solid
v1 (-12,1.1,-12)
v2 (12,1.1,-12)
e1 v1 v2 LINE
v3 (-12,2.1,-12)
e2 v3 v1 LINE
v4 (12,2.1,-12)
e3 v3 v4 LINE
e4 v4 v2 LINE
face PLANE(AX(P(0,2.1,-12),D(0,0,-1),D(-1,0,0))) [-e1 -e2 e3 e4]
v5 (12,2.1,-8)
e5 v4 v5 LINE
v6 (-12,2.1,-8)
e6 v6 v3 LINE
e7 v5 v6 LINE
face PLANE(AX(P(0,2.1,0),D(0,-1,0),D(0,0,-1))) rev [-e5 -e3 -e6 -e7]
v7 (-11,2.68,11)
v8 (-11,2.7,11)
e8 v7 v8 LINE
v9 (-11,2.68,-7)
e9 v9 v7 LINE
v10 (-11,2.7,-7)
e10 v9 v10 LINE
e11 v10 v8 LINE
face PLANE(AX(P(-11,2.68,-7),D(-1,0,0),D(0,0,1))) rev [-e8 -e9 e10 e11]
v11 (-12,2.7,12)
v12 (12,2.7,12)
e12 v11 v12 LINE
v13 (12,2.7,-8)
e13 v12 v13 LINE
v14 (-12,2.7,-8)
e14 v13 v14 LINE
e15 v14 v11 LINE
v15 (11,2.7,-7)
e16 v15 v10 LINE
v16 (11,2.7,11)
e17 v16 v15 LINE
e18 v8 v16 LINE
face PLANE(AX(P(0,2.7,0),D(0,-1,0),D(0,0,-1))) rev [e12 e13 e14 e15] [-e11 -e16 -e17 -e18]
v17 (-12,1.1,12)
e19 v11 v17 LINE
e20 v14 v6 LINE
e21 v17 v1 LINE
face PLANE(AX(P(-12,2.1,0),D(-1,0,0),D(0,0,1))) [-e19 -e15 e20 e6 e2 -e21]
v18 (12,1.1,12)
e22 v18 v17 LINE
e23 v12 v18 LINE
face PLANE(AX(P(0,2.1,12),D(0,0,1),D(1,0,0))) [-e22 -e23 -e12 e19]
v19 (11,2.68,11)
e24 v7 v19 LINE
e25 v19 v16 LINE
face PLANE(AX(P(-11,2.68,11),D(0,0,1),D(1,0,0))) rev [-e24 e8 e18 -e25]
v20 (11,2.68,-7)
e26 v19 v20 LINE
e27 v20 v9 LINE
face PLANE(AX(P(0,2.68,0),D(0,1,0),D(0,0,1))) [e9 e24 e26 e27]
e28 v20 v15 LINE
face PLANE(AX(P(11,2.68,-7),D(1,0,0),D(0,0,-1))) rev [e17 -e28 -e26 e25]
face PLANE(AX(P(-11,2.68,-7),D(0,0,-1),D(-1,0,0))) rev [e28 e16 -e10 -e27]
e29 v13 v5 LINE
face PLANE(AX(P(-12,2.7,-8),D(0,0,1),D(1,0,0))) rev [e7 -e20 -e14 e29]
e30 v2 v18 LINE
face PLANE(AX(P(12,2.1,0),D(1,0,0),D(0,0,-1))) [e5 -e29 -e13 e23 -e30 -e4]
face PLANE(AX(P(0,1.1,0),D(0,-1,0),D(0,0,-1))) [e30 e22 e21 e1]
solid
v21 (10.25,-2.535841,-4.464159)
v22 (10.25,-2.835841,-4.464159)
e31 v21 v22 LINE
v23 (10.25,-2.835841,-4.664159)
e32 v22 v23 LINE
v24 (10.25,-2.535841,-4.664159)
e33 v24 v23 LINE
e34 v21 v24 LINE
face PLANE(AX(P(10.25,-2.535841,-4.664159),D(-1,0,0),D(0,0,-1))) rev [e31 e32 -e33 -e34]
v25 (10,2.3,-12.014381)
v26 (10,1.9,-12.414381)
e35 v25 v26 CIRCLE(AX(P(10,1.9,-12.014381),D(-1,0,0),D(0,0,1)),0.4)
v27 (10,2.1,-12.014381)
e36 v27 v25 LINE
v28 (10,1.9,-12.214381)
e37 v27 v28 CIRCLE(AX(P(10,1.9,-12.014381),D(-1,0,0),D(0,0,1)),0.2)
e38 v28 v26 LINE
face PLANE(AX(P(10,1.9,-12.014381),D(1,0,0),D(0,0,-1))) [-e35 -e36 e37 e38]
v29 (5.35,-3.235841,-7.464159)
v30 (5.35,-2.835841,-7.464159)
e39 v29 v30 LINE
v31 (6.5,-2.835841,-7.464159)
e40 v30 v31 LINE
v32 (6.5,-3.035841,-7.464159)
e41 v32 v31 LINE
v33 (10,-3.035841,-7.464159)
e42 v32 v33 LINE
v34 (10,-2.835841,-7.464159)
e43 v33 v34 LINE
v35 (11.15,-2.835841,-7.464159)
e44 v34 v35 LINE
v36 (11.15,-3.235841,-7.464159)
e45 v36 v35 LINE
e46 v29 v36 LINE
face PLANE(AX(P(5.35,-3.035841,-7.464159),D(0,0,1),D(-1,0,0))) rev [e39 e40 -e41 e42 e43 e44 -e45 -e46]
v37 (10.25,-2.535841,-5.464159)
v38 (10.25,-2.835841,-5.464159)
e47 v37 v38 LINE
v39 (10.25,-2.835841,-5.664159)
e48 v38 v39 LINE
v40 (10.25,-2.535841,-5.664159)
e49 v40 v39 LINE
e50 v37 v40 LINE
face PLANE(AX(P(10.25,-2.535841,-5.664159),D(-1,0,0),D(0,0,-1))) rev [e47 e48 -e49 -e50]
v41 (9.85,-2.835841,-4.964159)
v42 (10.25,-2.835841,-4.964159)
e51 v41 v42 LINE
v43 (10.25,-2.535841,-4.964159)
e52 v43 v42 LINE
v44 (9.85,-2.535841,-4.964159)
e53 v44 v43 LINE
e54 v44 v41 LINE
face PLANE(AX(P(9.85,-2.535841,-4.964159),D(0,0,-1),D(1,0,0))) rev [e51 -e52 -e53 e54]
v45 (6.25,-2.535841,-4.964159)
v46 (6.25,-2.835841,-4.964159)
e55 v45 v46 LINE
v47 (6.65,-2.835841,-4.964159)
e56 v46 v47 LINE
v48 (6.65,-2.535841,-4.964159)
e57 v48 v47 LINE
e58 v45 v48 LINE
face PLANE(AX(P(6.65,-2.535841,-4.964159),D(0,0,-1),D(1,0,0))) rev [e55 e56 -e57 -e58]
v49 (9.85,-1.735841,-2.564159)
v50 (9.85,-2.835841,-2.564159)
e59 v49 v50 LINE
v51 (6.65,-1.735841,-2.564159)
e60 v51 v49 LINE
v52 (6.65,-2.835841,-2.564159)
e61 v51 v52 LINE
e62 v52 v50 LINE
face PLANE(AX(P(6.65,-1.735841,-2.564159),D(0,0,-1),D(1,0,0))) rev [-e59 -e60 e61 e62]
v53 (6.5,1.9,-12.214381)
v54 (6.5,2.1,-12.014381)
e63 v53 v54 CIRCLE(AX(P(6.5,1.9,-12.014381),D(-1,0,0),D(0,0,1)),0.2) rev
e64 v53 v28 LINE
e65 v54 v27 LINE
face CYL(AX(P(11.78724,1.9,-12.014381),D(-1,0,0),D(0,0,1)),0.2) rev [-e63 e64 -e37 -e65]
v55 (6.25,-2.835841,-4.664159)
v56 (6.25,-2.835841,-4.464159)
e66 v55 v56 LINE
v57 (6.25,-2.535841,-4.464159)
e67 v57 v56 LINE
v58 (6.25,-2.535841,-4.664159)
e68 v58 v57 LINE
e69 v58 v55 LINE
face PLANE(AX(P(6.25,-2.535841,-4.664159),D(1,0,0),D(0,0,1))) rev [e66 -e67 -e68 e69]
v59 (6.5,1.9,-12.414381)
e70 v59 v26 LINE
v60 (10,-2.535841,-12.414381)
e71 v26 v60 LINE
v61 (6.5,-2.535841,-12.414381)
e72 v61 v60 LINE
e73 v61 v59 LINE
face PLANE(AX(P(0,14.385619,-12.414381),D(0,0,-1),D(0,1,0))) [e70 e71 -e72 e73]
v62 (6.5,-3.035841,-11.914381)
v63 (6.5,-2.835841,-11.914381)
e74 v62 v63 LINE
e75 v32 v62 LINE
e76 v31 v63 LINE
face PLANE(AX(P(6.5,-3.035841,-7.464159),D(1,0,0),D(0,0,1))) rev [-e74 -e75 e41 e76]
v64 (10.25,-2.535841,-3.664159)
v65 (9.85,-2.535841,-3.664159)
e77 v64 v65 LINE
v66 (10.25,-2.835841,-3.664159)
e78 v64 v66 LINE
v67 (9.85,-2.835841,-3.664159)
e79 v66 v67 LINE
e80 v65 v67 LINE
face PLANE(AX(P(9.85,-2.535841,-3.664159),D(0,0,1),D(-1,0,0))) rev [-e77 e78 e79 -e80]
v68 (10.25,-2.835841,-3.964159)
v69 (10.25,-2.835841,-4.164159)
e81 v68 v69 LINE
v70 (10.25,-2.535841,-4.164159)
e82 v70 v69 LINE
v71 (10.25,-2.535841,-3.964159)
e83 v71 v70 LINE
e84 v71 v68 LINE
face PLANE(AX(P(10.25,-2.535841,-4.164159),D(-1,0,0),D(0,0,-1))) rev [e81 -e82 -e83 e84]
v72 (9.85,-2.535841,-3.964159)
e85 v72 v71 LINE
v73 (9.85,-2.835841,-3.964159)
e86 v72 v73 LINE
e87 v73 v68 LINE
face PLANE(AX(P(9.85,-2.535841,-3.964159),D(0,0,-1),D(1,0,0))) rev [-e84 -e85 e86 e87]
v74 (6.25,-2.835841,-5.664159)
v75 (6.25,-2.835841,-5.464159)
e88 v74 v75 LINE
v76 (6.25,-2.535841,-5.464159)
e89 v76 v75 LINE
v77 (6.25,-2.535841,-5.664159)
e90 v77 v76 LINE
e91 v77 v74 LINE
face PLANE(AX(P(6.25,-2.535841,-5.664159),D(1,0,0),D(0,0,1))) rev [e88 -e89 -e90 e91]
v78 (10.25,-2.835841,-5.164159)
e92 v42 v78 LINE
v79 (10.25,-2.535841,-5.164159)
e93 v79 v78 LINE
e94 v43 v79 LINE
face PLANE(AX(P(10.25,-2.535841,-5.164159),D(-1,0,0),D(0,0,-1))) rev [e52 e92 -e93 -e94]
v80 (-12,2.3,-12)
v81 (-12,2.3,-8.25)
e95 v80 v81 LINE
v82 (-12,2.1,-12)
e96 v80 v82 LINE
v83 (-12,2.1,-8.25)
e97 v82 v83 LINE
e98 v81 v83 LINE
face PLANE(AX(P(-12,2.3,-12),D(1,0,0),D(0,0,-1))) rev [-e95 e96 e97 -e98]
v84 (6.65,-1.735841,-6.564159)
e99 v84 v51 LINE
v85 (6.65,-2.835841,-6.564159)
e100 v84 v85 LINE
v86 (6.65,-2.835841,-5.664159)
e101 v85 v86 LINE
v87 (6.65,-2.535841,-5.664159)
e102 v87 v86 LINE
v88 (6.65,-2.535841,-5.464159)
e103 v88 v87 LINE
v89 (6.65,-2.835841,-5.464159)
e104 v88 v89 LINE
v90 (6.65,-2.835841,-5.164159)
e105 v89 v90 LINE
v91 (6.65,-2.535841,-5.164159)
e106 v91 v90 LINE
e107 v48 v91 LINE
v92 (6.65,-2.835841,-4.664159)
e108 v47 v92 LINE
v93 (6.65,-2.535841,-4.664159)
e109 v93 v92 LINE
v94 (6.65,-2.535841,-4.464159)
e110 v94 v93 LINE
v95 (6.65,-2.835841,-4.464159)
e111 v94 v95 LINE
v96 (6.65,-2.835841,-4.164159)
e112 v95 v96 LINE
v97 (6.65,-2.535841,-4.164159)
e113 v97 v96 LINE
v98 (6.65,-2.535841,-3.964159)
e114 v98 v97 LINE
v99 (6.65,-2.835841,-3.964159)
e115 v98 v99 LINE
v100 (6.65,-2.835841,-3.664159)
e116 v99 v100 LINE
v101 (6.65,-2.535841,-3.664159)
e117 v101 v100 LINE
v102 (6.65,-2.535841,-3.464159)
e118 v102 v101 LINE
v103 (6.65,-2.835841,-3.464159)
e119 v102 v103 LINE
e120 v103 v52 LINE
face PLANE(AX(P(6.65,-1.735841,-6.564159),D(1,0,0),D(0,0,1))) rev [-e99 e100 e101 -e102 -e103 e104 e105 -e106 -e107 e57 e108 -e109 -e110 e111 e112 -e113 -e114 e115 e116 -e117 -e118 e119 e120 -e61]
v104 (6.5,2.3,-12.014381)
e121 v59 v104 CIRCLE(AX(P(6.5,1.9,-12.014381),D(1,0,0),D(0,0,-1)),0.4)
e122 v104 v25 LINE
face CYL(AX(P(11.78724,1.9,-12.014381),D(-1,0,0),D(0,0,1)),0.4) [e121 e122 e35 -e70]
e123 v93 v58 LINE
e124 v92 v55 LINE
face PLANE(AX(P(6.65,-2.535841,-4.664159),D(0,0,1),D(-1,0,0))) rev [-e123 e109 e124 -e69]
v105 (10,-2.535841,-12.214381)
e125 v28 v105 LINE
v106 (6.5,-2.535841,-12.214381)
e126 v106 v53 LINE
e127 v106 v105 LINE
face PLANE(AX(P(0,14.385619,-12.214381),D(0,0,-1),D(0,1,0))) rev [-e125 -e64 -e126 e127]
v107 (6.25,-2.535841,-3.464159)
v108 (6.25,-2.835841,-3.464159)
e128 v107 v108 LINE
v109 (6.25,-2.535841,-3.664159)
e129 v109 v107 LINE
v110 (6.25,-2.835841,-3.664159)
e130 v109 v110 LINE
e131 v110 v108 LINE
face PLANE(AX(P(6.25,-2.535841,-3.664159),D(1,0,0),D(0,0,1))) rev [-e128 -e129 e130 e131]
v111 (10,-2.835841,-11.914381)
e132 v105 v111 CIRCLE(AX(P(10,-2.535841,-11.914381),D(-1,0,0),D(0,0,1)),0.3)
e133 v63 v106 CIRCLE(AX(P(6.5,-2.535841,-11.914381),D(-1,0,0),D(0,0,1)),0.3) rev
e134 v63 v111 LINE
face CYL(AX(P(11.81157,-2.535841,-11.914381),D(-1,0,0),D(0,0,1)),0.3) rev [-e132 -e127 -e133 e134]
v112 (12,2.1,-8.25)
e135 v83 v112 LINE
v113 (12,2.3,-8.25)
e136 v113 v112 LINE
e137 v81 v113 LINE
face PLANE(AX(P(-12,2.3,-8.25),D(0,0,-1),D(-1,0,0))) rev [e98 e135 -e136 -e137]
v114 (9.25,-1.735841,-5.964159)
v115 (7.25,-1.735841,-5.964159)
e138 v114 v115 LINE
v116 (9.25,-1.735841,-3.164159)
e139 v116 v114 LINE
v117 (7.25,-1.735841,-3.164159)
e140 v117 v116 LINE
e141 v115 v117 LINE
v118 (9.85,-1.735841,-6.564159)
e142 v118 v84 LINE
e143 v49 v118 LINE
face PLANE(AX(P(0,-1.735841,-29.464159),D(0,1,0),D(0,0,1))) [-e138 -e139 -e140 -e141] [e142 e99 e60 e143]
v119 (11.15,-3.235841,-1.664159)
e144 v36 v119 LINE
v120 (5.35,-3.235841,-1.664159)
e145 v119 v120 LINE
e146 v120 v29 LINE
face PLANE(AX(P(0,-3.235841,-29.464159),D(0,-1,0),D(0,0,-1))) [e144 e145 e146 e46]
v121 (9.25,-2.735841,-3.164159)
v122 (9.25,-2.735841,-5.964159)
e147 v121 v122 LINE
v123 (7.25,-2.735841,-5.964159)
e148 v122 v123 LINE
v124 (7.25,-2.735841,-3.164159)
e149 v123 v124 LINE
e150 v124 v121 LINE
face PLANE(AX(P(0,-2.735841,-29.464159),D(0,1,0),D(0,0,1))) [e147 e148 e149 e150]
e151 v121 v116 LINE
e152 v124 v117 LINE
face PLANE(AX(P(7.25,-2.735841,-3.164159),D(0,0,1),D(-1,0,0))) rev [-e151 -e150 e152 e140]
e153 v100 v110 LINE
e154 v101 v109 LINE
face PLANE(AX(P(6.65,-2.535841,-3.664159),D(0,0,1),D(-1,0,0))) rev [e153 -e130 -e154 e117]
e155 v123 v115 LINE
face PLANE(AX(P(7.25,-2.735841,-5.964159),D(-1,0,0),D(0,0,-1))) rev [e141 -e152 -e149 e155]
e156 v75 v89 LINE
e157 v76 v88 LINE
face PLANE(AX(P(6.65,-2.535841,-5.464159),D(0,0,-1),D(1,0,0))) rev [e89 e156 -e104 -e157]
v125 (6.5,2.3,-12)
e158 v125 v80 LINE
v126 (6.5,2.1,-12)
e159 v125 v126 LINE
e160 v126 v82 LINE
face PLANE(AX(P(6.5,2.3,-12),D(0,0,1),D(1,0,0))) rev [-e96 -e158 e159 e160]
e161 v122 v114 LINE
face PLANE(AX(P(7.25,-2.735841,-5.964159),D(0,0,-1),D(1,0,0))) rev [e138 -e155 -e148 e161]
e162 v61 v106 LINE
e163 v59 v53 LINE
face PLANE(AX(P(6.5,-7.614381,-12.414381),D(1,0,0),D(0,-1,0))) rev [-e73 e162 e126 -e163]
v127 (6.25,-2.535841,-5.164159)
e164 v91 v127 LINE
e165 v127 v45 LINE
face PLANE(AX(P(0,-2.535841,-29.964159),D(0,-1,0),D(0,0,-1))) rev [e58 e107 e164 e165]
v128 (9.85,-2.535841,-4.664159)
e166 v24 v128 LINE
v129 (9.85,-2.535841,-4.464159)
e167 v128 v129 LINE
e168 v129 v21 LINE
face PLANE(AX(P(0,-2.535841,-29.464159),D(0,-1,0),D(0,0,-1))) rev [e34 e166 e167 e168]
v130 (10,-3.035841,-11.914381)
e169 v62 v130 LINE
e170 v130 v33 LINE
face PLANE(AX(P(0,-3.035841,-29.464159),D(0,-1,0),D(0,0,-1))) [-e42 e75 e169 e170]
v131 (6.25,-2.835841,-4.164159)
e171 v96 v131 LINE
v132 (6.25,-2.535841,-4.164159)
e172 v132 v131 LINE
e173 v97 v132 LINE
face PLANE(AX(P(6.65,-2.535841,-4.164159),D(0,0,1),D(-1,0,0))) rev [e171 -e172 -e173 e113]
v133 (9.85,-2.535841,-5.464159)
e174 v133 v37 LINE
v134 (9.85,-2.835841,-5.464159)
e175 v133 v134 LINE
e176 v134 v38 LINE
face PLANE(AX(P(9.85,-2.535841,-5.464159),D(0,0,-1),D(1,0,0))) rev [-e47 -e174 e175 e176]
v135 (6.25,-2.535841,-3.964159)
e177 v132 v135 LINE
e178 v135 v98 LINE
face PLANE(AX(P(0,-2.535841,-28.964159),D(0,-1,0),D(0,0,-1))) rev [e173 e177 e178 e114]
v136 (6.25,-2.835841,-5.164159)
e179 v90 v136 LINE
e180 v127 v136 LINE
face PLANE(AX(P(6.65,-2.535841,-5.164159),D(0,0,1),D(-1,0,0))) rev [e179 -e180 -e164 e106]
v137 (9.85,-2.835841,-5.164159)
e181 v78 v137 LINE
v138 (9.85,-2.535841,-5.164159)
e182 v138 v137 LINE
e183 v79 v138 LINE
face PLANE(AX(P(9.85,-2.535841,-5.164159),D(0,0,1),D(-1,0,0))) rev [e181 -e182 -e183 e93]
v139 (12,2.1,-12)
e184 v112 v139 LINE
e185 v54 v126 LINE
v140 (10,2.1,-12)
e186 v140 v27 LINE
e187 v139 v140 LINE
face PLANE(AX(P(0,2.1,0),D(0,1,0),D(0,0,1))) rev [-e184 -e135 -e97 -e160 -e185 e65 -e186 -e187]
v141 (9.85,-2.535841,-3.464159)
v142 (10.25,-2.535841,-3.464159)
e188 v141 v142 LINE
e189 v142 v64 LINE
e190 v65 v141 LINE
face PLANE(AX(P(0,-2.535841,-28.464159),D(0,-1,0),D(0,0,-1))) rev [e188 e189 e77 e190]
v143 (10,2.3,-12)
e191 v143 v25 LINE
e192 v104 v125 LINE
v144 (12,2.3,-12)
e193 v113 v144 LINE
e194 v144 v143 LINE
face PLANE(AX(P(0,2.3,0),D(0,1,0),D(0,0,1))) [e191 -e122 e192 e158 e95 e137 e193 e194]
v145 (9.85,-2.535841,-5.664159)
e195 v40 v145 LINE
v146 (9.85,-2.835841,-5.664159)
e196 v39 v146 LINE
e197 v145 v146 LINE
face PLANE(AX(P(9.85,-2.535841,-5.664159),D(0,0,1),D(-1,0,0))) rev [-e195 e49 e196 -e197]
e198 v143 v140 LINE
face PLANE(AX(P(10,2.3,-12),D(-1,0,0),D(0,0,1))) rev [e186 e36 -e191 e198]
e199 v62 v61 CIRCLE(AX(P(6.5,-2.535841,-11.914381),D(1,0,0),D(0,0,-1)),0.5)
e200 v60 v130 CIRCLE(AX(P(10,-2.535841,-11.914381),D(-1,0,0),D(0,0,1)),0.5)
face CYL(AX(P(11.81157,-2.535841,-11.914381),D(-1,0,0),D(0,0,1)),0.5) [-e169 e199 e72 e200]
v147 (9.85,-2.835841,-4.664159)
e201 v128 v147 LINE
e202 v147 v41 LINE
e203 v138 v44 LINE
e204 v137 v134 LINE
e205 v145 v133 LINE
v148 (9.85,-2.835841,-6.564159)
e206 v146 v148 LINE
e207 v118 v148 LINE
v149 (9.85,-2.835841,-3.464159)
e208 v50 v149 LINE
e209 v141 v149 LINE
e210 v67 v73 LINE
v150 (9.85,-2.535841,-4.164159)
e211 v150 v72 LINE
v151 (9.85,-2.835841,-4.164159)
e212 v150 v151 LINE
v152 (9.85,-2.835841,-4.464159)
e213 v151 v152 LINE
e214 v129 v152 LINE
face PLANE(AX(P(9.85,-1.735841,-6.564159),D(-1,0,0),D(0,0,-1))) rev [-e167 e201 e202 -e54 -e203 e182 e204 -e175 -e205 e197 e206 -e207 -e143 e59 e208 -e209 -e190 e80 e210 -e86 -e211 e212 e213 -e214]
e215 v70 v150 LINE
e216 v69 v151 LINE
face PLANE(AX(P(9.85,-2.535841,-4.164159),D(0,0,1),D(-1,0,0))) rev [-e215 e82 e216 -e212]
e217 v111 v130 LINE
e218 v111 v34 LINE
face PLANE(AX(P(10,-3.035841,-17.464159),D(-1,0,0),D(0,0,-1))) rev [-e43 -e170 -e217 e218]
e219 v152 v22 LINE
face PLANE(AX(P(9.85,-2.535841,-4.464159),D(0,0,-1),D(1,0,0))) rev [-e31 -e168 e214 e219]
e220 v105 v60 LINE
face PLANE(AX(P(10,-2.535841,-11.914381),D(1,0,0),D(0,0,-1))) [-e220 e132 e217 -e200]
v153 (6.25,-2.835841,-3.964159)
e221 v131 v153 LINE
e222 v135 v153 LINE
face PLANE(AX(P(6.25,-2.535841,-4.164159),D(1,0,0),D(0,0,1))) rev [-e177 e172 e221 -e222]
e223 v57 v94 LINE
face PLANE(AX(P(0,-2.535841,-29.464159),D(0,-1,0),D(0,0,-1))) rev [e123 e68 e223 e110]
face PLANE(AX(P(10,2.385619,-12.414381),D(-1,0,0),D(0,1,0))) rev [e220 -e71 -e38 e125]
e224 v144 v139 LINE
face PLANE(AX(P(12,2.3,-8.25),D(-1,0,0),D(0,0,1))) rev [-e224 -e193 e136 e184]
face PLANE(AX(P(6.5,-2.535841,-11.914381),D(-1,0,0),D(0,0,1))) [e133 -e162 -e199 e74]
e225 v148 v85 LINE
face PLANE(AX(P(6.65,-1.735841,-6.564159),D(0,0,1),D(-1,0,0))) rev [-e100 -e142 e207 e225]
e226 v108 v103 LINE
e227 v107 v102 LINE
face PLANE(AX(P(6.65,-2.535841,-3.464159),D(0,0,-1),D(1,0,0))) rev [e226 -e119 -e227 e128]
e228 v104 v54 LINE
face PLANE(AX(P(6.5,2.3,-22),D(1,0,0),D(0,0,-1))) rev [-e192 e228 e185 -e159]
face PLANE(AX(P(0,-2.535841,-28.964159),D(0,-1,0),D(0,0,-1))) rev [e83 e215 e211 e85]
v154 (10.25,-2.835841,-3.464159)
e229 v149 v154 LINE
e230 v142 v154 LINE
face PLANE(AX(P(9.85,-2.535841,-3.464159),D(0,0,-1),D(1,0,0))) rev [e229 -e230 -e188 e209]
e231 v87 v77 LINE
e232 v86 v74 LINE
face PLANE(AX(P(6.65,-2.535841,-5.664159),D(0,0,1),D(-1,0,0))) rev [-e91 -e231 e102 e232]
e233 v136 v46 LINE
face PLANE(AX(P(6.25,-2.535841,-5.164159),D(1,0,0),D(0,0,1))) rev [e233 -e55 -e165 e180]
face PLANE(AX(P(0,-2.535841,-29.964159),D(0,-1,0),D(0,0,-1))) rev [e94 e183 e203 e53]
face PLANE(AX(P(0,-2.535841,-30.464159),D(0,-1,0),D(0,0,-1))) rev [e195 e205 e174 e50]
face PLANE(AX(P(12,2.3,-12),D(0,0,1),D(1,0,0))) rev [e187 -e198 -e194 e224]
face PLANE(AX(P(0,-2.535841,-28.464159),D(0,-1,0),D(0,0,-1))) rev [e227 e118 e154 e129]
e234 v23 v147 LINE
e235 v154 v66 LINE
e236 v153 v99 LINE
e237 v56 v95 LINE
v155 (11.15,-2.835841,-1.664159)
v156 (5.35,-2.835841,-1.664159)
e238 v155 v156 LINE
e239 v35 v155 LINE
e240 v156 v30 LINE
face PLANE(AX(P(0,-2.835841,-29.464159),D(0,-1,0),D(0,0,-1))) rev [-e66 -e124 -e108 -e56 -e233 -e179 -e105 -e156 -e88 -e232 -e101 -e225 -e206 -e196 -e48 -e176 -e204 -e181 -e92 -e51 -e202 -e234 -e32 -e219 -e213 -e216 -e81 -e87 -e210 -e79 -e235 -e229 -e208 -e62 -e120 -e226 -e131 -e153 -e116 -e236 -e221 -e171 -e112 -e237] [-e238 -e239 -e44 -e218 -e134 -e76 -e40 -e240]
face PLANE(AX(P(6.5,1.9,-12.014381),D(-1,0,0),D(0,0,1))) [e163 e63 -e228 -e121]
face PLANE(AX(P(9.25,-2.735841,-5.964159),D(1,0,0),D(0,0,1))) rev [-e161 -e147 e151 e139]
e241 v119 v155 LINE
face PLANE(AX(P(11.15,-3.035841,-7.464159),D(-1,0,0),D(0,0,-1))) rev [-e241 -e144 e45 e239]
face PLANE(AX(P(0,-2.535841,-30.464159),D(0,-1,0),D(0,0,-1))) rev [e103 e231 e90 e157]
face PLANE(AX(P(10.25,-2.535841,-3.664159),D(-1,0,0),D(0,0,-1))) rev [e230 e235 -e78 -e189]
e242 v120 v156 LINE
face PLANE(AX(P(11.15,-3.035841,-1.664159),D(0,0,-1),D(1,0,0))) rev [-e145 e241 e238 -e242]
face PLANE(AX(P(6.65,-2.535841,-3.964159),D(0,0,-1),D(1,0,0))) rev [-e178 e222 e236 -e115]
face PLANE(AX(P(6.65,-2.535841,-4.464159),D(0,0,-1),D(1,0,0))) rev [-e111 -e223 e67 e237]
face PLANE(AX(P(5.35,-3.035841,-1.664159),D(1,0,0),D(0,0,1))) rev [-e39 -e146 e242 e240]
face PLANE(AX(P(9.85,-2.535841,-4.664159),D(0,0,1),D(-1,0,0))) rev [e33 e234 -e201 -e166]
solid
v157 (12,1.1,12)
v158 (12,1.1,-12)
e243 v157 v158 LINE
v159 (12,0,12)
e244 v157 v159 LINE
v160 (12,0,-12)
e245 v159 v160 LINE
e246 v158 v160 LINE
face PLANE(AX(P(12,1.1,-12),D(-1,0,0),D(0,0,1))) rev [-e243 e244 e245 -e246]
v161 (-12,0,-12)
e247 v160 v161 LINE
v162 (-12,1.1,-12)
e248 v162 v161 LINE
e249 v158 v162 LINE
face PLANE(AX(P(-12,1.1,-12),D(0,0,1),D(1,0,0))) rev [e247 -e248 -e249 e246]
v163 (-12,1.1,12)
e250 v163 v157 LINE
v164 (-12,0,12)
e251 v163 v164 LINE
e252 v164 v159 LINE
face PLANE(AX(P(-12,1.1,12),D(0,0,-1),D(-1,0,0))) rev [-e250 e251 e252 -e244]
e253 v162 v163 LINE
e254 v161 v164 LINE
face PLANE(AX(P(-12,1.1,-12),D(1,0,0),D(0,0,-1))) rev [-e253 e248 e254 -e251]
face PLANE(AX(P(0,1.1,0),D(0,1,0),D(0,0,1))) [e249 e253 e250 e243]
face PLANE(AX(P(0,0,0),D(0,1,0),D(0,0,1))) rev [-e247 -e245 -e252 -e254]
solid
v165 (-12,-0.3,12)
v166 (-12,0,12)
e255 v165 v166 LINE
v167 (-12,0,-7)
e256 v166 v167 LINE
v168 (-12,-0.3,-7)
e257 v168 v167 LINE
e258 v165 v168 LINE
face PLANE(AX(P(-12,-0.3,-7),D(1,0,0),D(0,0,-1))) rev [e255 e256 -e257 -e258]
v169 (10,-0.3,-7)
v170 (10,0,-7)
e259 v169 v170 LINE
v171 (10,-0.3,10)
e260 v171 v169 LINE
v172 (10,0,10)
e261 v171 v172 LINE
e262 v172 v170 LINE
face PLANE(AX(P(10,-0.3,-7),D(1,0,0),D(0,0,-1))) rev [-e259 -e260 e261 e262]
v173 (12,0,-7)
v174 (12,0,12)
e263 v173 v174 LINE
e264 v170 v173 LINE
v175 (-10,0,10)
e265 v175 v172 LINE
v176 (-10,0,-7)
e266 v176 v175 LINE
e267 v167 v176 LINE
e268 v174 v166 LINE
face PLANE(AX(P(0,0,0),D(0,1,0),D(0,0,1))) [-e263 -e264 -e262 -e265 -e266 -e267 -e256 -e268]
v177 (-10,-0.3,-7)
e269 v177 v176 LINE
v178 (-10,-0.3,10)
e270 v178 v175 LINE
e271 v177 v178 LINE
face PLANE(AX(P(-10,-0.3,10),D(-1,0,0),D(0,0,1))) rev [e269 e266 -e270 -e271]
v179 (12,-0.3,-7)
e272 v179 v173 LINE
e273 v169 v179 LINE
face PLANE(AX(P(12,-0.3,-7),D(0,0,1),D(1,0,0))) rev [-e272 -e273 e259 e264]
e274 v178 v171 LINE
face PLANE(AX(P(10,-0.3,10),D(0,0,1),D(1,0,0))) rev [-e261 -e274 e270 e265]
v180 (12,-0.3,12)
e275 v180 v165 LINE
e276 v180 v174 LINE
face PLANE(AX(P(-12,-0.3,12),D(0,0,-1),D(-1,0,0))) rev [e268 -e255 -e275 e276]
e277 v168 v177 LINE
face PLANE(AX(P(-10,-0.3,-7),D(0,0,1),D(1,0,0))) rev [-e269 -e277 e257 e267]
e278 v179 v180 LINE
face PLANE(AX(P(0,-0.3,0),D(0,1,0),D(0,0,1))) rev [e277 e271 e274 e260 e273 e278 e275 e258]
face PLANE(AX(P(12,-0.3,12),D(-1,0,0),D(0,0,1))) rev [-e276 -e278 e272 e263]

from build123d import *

# Parameters (mm, degrees)
SKETCH_1_W                 = 24
SKETCH_1_H                 = 24
EXTRUDE_1_DEPTH            = 1.1
EXTRUDE_START              = 1.1
SKETCH_1_2_W               = 24
SKETCH_1_2_H               = 24
EXTRUDE_2_DEPTH            = 1
SKETCH_2_W                 = 24
SKETCH_2_H                 = 20
EXTRUDE_3_DEPTH            = 0.6
SM_BASE_FLANGE_1_DEPTH     = 0.2
SKETCH_8_W                 = 3.2
SKETCH_8_H                 = 4
EXTRUDE_4_DEPTH            = 1.1
SKETCH_9_W                 = 2
SKETCH_9_H                 = 2.8
CUT_EXTRUDE_1_DEPTH        = 1
SKETCH_18_W                = 5.8
SKETCH_18_H                = 5.8
EXTRUDE_6_DEPTH            = 0.2
SKETCH_19_W                = 0.4
SKETCH_19_H                = 0.2
EXTRUDE_7_DEPTH            = 0.3
SKETCH_17_W                = 22
SKETCH_17_H                = 18
CUT_EXTRUDE_2_DEPTH        = 0.02
EXTRUDE_5_DEPTH            = 0.3
PATTERN_LINEAR_1_COUNT     = 3
PATTERN_LINEAR_1_PITCH     = 0.5
PATTERN_LINEAR_1_COL_COUNT = 3
PATTERN_LINEAR_1_COL_PITCH = 0.5
OTHER_START                = 5.35
OTHER_11_DEPTH             = 5.8
OTHER_START_2              = 6.65
OTHER_11_2_DEPTH           = 3.2
OTHER_11_3_OUTLINE_W       = 5.8
OTHER_11_3_OUTLINE_H       = 0.4
OTHER_11_3_DEPTH           = 5.8
OTHER_11_4_OUTLINE_W       = 2.8
OTHER_11_4_OUTLINE_H       = 1
OTHER_11_4_DEPTH           = 0.6
OTHER_START_3              = 9.25
OTHER_11_5_OUTLINE_W       = 2.8
OTHER_11_5_OUTLINE_H       = 1
OTHER_11_5_DEPTH           = 0.6
OTHER_START_4              = 6.5
OTHER_11_6_OUTLINE_W       = 0.2
OTHER_11_6_OUTLINE_H       = 0.1
OTHER_11_6_DEPTH           = 3.5
OTHER_START_5              = 6.25
OTHER_11_7_OUTLINE_W       = 0.2
OTHER_11_7_OUTLINE_H       = 0.3
OTHER_11_7_DEPTH           = 0.4
OTHER_START_6              = 9.85
OTHER_11_8_OUTLINE_W       = 0.2
OTHER_11_8_OUTLINE_H       = 0.3
OTHER_11_8_DEPTH           = 0.4
OTHER_12_DEPTH             = 5.8
OTHER_12_2_DEPTH           = 3.2
OTHER_12_3_OUTLINE_W       = 0.4
OTHER_12_3_OUTLINE_H       = 5.8
OTHER_12_3_DEPTH           = 5.8
OTHER_12_4_OUTLINE_W       = 1
OTHER_12_4_OUTLINE_H       = 2.8
OTHER_12_4_DEPTH           = 0.6
OTHER_12_5_OUTLINE_W       = 1
OTHER_12_5_OUTLINE_H       = 2.8
OTHER_12_5_DEPTH           = 0.6
OTHER_12_6_OUTLINE_W       = 0.1
OTHER_12_6_OUTLINE_H       = 0.2
OTHER_12_6_DEPTH           = 3.5
OTHER_12_7_OUTLINE_W       = 0.3
OTHER_12_7_OUTLINE_H       = 0.2
OTHER_12_7_DEPTH           = 0.4
OTHER_12_8_OUTLINE_W       = 0.3
OTHER_12_8_OUTLINE_H       = 0.2
OTHER_12_8_DEPTH           = 0.4


# Read off the part's stored shape, not the designer's step: Нарисованный сгиб11, Нарисованный сгиб12
# Sheet-metal steps are written as plain solids
with BuildPart() as part:
    # Sketch 1 → Бобышка-Вытянуть1 (new body)
    with BuildSketch(Plane(origin=(0, 0, 0), x_dir=(1, 0, 0), z_dir=(0, 1, 0))):
        Rectangle(SKETCH_1_W, SKETCH_1_H)
    extrude(amount=EXTRUDE_1_DEPTH)


with BuildPart() as body_2:
    # Эскиз1<2> → Бобышка-Вытянуть2 (new body)
    with BuildSketch(Plane(origin=(0, 0, 0), x_dir=(1, 0, 0), z_dir=(0, 1, 0)).offset(EXTRUDE_START)):
        Rectangle(SKETCH_1_2_W, SKETCH_1_2_H)
    extrude(amount=EXTRUDE_2_DEPTH)

    # Sketch 2 → Бобышка-Вытянуть3 (add)
    with BuildSketch(Plane(origin=(0, 2.1, 0), x_dir=(1, 0, 0), z_dir=(0, 1, 0))):
        with Locations((0, -2)):
            Rectangle(SKETCH_2_W, SKETCH_2_H)
    extrude(amount=EXTRUDE_3_DEPTH)

    # Эскиз17 → Вырез-Вытянуть2 (cut)
    with BuildSketch(Plane(origin=(0, 2.7, 0), x_dir=(1, 0, 0), z_dir=(0, 1, 0))):
        with Locations((0, -2)):
            Rectangle(SKETCH_17_W, SKETCH_17_H)
    extrude(amount=-CUT_EXTRUDE_2_DEPTH, mode=Mode.SUBTRACT)


with BuildPart() as body_3:
    # Эскиз3 → Базовая кромка1 (new body)
    with BuildSketch(Plane(origin=(0, 2.1, 0), x_dir=(1, 0, 0), z_dir=(0, 1, 0))):
        Polygon((-12, 12), (-12, 8.25), (12, 8.25), (12, 12), (10, 12), (10, 22), (11.15, 22), (11.15, 27.8), (5.35, 27.8), (5.35, 22), (6.5, 22), (6.5, 12), align=None)
    extrude(amount=SM_BASE_FLANGE_1_DEPTH)

    # Эскиз8 → Бобышка-Вытянуть4 (add)
    with BuildSketch(Plane.XZ.offset(-2.1)):
        with Locations((8.25, -24.9)):
            Rectangle(SKETCH_8_W, SKETCH_8_H)
    extrude(amount=EXTRUDE_4_DEPTH)

    # Эскиз9 → Вырез-Вытянуть1 (cut)
    with BuildSketch(Plane.XZ.offset(-1)):
        with Locations((8.25, -24.9)):
            Rectangle(SKETCH_9_W, SKETCH_9_H)
    extrude(amount=-CUT_EXTRUDE_1_DEPTH, mode=Mode.SUBTRACT)

    # Эскиз18 → Бобышка-Вытянуть6 (add)
    with BuildSketch(Plane(origin=(0, 2.3, 0), x_dir=(1, 0, 0), z_dir=(0, 1, 0))):
        with Locations((8.25, 24.9)):
            Rectangle(SKETCH_18_W, SKETCH_18_H)
    extrude(amount=EXTRUDE_6_DEPTH)

    # Эскиз19 → Бобышка-Вытянуть7 (add)
    with BuildSketch(Plane.XZ.offset(-2.1)):
        with Locations((6.45, -24.9)):
            Rectangle(SKETCH_19_W, SKETCH_19_H)
        with Locations((10.05, -24.9)):
            Rectangle(SKETCH_19_W, SKETCH_19_H)
    extrude_7 = extrude(amount=EXTRUDE_7_DEPTH)

    # Линейный массив1: Бобышка-Вытянуть7 ×3
    with Locations(*[(0, 0, -i * PATTERN_LINEAR_1_PITCH) for i in range(1, PATTERN_LINEAR_1_COUNT)]):
        add(extrude_7)

    # Линейный массив1 col: Бобышка-Вытянуть7 ×3
    with Locations(*[(0, 0, i * PATTERN_LINEAR_1_COL_PITCH) for i in range(1, PATTERN_LINEAR_1_COL_COUNT)]):
        add(extrude_7)

    # Other 11 outline → Other 11 (cut)
    with BuildSketch(Plane.YZ.offset(OTHER_START)):
        with BuildLine():
            ThreePointArc((2.3, -12.014380551), (2.246410161, -12.21438055), (2.1, -12.360790712))
            Line((2.1, -12.360790712), (2.1, -22.9))
            Line((2.1, -22.9), (1, -22.9))
            Line((1, -22.9), (1, -26.9))
            Line((1, -26.9), (2.1, -26.9))
            Line((2.1, -26.9), (2.1, -27.8))
            Line((2.1, -27.8), (2.5, -27.8))
            Line((2.5, -27.8), (2.5, -22))
            Line((2.5, -22), (2.3, -22))
            Line((2.3, -22), (2.3, -12.014380551))
        make_face()
    extrude(amount=OTHER_11_DEPTH, mode=Mode.SUBTRACT)

    # Other 11 2 outline → Other 11 2 (add)
    with BuildSketch(Plane.YZ.offset(OTHER_START_2)):
        with BuildLine():
            Line((1.9, -12.214380551), (-8.514380551, -12.214380551))
            Line((-8.514380551, -12.214380551), (-8.514380551, -11.114380551))
            Line((-8.514380551, -11.114380551), (-9.114380551, -11.114380551))
            Line((-9.114380551, -11.114380551), (-9.114380551, -12.114380551))
            Line((-9.114380551, -12.114380551), (-11.914380551, -12.114380551))
            Line((-11.914380551, -12.114380551), (-11.914380551, -11.114380551))
            Line((-11.914380551, -11.114380551), (-12.514380551, -11.114380551))
            Line((-12.514380551, -11.114380551), (-12.514380551, -12.214380551))
            Line((-12.514380551, -12.214380551), (-13.414380551, -12.214380551))
            Line((-13.414380551, -12.214380551), (-13.414380551, -12.614380551))
            Line((-13.414380551, -12.614380551), (-7.614380551, -12.614380551))
            Line((-7.614380551, -12.614380551), (-7.614380551, -12.414380551))
            Line((-7.614380551, -12.414380551), (1.9, -12.414380551))
            ThreePointArc((1.9, -12.414380551), (2.003527618, -12.400750881), (2.1, -12.360790712))
            Line((2.1, -12.360790712), (2.1, -12.014380551))
            ThreePointArc((2.1, -12.014380551), (2.041421356, -12.155801907), (1.9, -12.214380551))
        make_face()
    extrude(amount=OTHER_11_2_DEPTH)

    # Other 11 3 outline → Other 11 3 (add)
    with BuildSketch(Plane.YZ.offset(OTHER_START)):
        with Locations((-10.514380551, -12.414380551)):
            Rectangle(OTHER_11_3_OUTLINE_W, OTHER_11_3_OUTLINE_H)
    extrude(amount=OTHER_11_3_DEPTH)

    # Other 11 4 outline → Other 11 4 (add)
    with BuildSketch(Plane.YZ.offset(OTHER_START_2)):
        with Locations((-10.514380551, -11.614380551)):
            Rectangle(OTHER_11_4_OUTLINE_W, OTHER_11_4_OUTLINE_H)
    extrude(amount=OTHER_11_4_DEPTH)

    # Other 11 5 outline → Other 11 5 (add)
    with BuildSketch(Plane.YZ.offset(OTHER_START_3)):
        with Locations((-10.514380551, -11.614380551)):
            Rectangle(OTHER_11_5_OUTLINE_W, OTHER_11_5_OUTLINE_H)
    extrude(amount=OTHER_11_5_DEPTH)

    # Other 11 6 outline → Other 11 6 (add)
    with BuildSketch(Plane.YZ.offset(OTHER_START_4)):
        with BuildLine():
            Line((-7.614380551, -12.214380551), (-7.614380551, -12.414380551))
            Line((-7.614380551, -12.414380551), (1.9, -12.414380551))
            ThreePointArc((1.9, -12.414380551), (2.003527618, -12.400750881), (2.1, -12.360790712))
            Line((2.1, -12.360790712), (2.1, -12.014380551))
            ThreePointArc((2.1, -12.014380551), (2.041421356, -12.155801907), (1.9, -12.214380551))
            Line((1.9, -12.214380551), (-7.614380551, -12.214380551))
        make_face()
        with Locations((-9.514380551, -12.164380551)):
            Rectangle(OTHER_11_6_OUTLINE_W, OTHER_11_6_OUTLINE_H)
        with Locations((-10.014380551, -12.164380551)):
            Rectangle(OTHER_11_6_OUTLINE_W, OTHER_11_6_OUTLINE_H)
        with Locations((-11.514380551, -12.164380551)):
            Rectangle(OTHER_11_6_OUTLINE_W, OTHER_11_6_OUTLINE_H)
        with Locations((-10.514380551, -12.164380551)):
            Rectangle(OTHER_11_6_OUTLINE_W, OTHER_11_6_OUTLINE_H)
        with Locations((-11.014380551, -12.164380551)):
            Rectangle(OTHER_11_6_OUTLINE_W, OTHER_11_6_OUTLINE_H)
    extrude(amount=OTHER_11_6_DEPTH)

    # Other 11 7 outline → Other 11 7 (add)
    with BuildSketch(Plane.YZ.offset(OTHER_START_5)):
        with Locations((-9.514380551, -12.064380551)):
            Rectangle(OTHER_11_7_OUTLINE_W, OTHER_11_7_OUTLINE_H)
        with Locations((-10.014380551, -12.064380551)):
            Rectangle(OTHER_11_7_OUTLINE_W, OTHER_11_7_OUTLINE_H)
        with Locations((-11.514380551, -12.064380551)):
            Rectangle(OTHER_11_7_OUTLINE_W, OTHER_11_7_OUTLINE_H)
        with Locations((-10.514380551, -12.064380551)):
            Rectangle(OTHER_11_7_OUTLINE_W, OTHER_11_7_OUTLINE_H)
        with Locations((-11.014380551, -12.064380551)):
            Rectangle(OTHER_11_7_OUTLINE_W, OTHER_11_7_OUTLINE_H)
    extrude(amount=OTHER_11_7_DEPTH)

    # Other 11 8 outline → Other 11 8 (add)
    with BuildSketch(Plane.YZ.offset(OTHER_START_6)):
        with Locations((-9.514380551, -12.064380551)):
            Rectangle(OTHER_11_8_OUTLINE_W, OTHER_11_8_OUTLINE_H)
        with Locations((-10.014380551, -12.064380551)):
            Rectangle(OTHER_11_8_OUTLINE_W, OTHER_11_8_OUTLINE_H)
        with Locations((-11.514380551, -12.064380551)):
            Rectangle(OTHER_11_8_OUTLINE_W, OTHER_11_8_OUTLINE_H)
        with Locations((-10.514380551, -12.064380551)):
            Rectangle(OTHER_11_8_OUTLINE_W, OTHER_11_8_OUTLINE_H)
        with Locations((-11.014380551, -12.064380551)):
            Rectangle(OTHER_11_8_OUTLINE_W, OTHER_11_8_OUTLINE_H)
    extrude(amount=OTHER_11_8_DEPTH)

    # Other 12 outline → Other 12 (cut)
    with BuildSketch(Plane.YZ.offset(OTHER_START)):
        with BuildLine():
            ThreePointArc((-2.535840735, -12.414380551), (-2.759447533, -12.361594146), (-2.935840735, -12.214380551))
            Line((-2.935840735, -12.214380551), (-8.514380551, -12.214380551))
            Line((-8.514380551, -12.214380551), (-8.514380551, -11.114380551))
            Line((-8.514380551, -11.114380551), (-12.514380551, -11.114380551))
            Line((-12.514380551, -11.114380551), (-12.514380551, -12.214380551))
            Line((-12.514380551, -12.214380551), (-13.414380551, -12.214380551))
            Line((-13.414380551, -12.214380551), (-13.414380551, -12.614380551))
            Line((-13.414380551, -12.614380551), (-7.614380551, -12.614380551))
            Line((-7.614380551, -12.614380551), (-7.614380551, -12.414380551))
            Line((-7.614380551, -12.414380551), (-2.535840735, -12.414380551))
        make_face()
    extrude(amount=OTHER_12_DEPTH, mode=Mode.SUBTRACT)

    # Other 12 2 outline → Other 12 2 (add)
    with BuildSketch(Plane.YZ.offset(OTHER_START_2)):
        with BuildLine():
            Line((-2.835840735, -11.914380551), (-2.835840735, -6.564159265))
            Line((-2.835840735, -6.564159265), (-1.735840735, -6.564159265))
            Line((-1.735840735, -6.564159265), (-1.735840735, -5.964159265))
            Line((-1.735840735, -5.964159265), (-2.735840735, -5.964159265))
            Line((-2.735840735, -5.964159265), (-2.735840735, -3.164159265))
            Line((-2.735840735, -3.164159265), (-1.735840735, -3.164159265))
            Line((-1.735840735, -3.164159265), (-1.735840735, -2.564159265))
            Line((-1.735840735, -2.564159265), (-2.835840735, -2.564159265))
            Line((-2.835840735, -2.564159265), (-2.835840735, -1.664159265))
            Line((-2.835840735, -1.664159265), (-3.235840735, -1.664159265))
            Line((-3.235840735, -1.664159265), (-3.235840735, -7.464159265))
            Line((-3.235840735, -7.464159265), (-3.035840735, -7.464159265))
            Line((-3.035840735, -7.464159265), (-3.035840735, -11.914380551))
            ThreePointArc((-3.035840735, -11.914380551), (-3.010182384, -12.072494434), (-2.935840735, -12.214380551))
            Line((-2.935840735, -12.214380551), (-2.535840735, -12.214380551))
            ThreePointArc((-2.535840735, -12.214380551), (-2.747972769, -12.126512585), (-2.835840735, -11.914380551))
        make_face()
    extrude(amount=OTHER_12_2_DEPTH)

    # Other 12 3 outline → Other 12 3 (add)
    with BuildSketch(Plane.YZ.offset(OTHER_START)):
        with Locations((-3.035840735, -4.564159265)):
            Rectangle(OTHER_12_3_OUTLINE_W, OTHER_12_3_OUTLINE_H)
    extrude(amount=OTHER_12_3_DEPTH)

    # Other 12 4 outline → Other 12 4 (add)
    with BuildSketch(Plane.YZ.offset(OTHER_START_2)):
        with Locations((-2.235840735, -4.564159265)):
            Rectangle(OTHER_12_4_OUTLINE_W, OTHER_12_4_OUTLINE_H)
    extrude(amount=OTHER_12_4_DEPTH)

    # Other 12 5 outline → Other 12 5 (add)
    with BuildSketch(Plane.YZ.offset(OTHER_START_3)):
        with Locations((-2.235840735, -4.564159265)):
            Rectangle(OTHER_12_5_OUTLINE_W, OTHER_12_5_OUTLINE_H)
    extrude(amount=OTHER_12_5_DEPTH)

    # Other 12 6 outline → Other 12 6 (add)
    with BuildSketch(Plane.YZ.offset(OTHER_START_4)):
        with BuildLine():
            Line((-2.835840735, -7.464159265), (-3.035840735, -7.464159265))
            Line((-3.035840735, -7.464159265), (-3.035840735, -11.914380551))
            ThreePointArc((-3.035840735, -11.914380551), (-3.010182384, -12.072494434), (-2.935840735, -12.214380551))
            Line((-2.935840735, -12.214380551), (-2.535840735, -12.214380551))
            ThreePointArc((-2.535840735, -12.214380551), (-2.747972769, -12.126512585), (-2.835840735, -11.914380551))
            Line((-2.835840735, -11.914380551), (-2.835840735, -7.464159265))
        make_face()
        with Locations((-2.785840735, -5.564159265)):
            Rectangle(OTHER_12_6_OUTLINE_W, OTHER_12_6_OUTLINE_H)
        with Locations((-2.785840735, -5.064159265)):
            Rectangle(OTHER_12_6_OUTLINE_W, OTHER_12_6_OUTLINE_H)
        with Locations((-2.785840735, -3.564159265)):
            Rectangle(OTHER_12_6_OUTLINE_W, OTHER_12_6_OUTLINE_H)
        with Locations((-2.785840735, -4.564159265)):
            Rectangle(OTHER_12_6_OUTLINE_W, OTHER_12_6_OUTLINE_H)
        with Locations((-2.785840735, -4.064159265)):
            Rectangle(OTHER_12_6_OUTLINE_W, OTHER_12_6_OUTLINE_H)
    extrude(amount=OTHER_12_6_DEPTH)

    # Other 12 7 outline → Other 12 7 (add)
    with BuildSketch(Plane.YZ.offset(OTHER_START_5)):
        with Locations((-2.685840735, -5.564159265)):
            Rectangle(OTHER_12_7_OUTLINE_W, OTHER_12_7_OUTLINE_H)
        with Locations((-2.685840735, -5.064159265)):
            Rectangle(OTHER_12_7_OUTLINE_W, OTHER_12_7_OUTLINE_H)
        with Locations((-2.685840735, -3.564159265)):
            Rectangle(OTHER_12_7_OUTLINE_W, OTHER_12_7_OUTLINE_H)
        with Locations((-2.685840735, -4.564159265)):
            Rectangle(OTHER_12_7_OUTLINE_W, OTHER_12_7_OUTLINE_H)
        with Locations((-2.685840735, -4.064159265)):
            Rectangle(OTHER_12_7_OUTLINE_W, OTHER_12_7_OUTLINE_H)
    extrude(amount=OTHER_12_7_DEPTH)

    # Other 12 8 outline → Other 12 8 (add)
    with BuildSketch(Plane.YZ.offset(OTHER_START_6)):
        with Locations((-2.685840735, -5.564159265)):
            Rectangle(OTHER_12_8_OUTLINE_W, OTHER_12_8_OUTLINE_H)
        with Locations((-2.685840735, -5.064159265)):
            Rectangle(OTHER_12_8_OUTLINE_W, OTHER_12_8_OUTLINE_H)
        with Locations((-2.685840735, -3.564159265)):
            Rectangle(OTHER_12_8_OUTLINE_W, OTHER_12_8_OUTLINE_H)
        with Locations((-2.685840735, -4.564159265)):
            Rectangle(OTHER_12_8_OUTLINE_W, OTHER_12_8_OUTLINE_H)
        with Locations((-2.685840735, -4.064159265)):
            Rectangle(OTHER_12_8_OUTLINE_W, OTHER_12_8_OUTLINE_H)
    extrude(amount=OTHER_12_8_DEPTH)


with BuildPart() as body_4:
    # Эскиз15 → Бобышка-Вытянуть5 (new body)
    with BuildSketch(Plane.XZ):
        Polygon((-12, -7), (-12, 12), (12, 12), (12, -7), (10, -7), (10, 10), (-10, 10), (-10, -7), align=None)
    extrude(amount=EXTRUDE_5_DEPTH)


solid = Compound([part.part, body_2.part, body_3.part, body_4.part])
